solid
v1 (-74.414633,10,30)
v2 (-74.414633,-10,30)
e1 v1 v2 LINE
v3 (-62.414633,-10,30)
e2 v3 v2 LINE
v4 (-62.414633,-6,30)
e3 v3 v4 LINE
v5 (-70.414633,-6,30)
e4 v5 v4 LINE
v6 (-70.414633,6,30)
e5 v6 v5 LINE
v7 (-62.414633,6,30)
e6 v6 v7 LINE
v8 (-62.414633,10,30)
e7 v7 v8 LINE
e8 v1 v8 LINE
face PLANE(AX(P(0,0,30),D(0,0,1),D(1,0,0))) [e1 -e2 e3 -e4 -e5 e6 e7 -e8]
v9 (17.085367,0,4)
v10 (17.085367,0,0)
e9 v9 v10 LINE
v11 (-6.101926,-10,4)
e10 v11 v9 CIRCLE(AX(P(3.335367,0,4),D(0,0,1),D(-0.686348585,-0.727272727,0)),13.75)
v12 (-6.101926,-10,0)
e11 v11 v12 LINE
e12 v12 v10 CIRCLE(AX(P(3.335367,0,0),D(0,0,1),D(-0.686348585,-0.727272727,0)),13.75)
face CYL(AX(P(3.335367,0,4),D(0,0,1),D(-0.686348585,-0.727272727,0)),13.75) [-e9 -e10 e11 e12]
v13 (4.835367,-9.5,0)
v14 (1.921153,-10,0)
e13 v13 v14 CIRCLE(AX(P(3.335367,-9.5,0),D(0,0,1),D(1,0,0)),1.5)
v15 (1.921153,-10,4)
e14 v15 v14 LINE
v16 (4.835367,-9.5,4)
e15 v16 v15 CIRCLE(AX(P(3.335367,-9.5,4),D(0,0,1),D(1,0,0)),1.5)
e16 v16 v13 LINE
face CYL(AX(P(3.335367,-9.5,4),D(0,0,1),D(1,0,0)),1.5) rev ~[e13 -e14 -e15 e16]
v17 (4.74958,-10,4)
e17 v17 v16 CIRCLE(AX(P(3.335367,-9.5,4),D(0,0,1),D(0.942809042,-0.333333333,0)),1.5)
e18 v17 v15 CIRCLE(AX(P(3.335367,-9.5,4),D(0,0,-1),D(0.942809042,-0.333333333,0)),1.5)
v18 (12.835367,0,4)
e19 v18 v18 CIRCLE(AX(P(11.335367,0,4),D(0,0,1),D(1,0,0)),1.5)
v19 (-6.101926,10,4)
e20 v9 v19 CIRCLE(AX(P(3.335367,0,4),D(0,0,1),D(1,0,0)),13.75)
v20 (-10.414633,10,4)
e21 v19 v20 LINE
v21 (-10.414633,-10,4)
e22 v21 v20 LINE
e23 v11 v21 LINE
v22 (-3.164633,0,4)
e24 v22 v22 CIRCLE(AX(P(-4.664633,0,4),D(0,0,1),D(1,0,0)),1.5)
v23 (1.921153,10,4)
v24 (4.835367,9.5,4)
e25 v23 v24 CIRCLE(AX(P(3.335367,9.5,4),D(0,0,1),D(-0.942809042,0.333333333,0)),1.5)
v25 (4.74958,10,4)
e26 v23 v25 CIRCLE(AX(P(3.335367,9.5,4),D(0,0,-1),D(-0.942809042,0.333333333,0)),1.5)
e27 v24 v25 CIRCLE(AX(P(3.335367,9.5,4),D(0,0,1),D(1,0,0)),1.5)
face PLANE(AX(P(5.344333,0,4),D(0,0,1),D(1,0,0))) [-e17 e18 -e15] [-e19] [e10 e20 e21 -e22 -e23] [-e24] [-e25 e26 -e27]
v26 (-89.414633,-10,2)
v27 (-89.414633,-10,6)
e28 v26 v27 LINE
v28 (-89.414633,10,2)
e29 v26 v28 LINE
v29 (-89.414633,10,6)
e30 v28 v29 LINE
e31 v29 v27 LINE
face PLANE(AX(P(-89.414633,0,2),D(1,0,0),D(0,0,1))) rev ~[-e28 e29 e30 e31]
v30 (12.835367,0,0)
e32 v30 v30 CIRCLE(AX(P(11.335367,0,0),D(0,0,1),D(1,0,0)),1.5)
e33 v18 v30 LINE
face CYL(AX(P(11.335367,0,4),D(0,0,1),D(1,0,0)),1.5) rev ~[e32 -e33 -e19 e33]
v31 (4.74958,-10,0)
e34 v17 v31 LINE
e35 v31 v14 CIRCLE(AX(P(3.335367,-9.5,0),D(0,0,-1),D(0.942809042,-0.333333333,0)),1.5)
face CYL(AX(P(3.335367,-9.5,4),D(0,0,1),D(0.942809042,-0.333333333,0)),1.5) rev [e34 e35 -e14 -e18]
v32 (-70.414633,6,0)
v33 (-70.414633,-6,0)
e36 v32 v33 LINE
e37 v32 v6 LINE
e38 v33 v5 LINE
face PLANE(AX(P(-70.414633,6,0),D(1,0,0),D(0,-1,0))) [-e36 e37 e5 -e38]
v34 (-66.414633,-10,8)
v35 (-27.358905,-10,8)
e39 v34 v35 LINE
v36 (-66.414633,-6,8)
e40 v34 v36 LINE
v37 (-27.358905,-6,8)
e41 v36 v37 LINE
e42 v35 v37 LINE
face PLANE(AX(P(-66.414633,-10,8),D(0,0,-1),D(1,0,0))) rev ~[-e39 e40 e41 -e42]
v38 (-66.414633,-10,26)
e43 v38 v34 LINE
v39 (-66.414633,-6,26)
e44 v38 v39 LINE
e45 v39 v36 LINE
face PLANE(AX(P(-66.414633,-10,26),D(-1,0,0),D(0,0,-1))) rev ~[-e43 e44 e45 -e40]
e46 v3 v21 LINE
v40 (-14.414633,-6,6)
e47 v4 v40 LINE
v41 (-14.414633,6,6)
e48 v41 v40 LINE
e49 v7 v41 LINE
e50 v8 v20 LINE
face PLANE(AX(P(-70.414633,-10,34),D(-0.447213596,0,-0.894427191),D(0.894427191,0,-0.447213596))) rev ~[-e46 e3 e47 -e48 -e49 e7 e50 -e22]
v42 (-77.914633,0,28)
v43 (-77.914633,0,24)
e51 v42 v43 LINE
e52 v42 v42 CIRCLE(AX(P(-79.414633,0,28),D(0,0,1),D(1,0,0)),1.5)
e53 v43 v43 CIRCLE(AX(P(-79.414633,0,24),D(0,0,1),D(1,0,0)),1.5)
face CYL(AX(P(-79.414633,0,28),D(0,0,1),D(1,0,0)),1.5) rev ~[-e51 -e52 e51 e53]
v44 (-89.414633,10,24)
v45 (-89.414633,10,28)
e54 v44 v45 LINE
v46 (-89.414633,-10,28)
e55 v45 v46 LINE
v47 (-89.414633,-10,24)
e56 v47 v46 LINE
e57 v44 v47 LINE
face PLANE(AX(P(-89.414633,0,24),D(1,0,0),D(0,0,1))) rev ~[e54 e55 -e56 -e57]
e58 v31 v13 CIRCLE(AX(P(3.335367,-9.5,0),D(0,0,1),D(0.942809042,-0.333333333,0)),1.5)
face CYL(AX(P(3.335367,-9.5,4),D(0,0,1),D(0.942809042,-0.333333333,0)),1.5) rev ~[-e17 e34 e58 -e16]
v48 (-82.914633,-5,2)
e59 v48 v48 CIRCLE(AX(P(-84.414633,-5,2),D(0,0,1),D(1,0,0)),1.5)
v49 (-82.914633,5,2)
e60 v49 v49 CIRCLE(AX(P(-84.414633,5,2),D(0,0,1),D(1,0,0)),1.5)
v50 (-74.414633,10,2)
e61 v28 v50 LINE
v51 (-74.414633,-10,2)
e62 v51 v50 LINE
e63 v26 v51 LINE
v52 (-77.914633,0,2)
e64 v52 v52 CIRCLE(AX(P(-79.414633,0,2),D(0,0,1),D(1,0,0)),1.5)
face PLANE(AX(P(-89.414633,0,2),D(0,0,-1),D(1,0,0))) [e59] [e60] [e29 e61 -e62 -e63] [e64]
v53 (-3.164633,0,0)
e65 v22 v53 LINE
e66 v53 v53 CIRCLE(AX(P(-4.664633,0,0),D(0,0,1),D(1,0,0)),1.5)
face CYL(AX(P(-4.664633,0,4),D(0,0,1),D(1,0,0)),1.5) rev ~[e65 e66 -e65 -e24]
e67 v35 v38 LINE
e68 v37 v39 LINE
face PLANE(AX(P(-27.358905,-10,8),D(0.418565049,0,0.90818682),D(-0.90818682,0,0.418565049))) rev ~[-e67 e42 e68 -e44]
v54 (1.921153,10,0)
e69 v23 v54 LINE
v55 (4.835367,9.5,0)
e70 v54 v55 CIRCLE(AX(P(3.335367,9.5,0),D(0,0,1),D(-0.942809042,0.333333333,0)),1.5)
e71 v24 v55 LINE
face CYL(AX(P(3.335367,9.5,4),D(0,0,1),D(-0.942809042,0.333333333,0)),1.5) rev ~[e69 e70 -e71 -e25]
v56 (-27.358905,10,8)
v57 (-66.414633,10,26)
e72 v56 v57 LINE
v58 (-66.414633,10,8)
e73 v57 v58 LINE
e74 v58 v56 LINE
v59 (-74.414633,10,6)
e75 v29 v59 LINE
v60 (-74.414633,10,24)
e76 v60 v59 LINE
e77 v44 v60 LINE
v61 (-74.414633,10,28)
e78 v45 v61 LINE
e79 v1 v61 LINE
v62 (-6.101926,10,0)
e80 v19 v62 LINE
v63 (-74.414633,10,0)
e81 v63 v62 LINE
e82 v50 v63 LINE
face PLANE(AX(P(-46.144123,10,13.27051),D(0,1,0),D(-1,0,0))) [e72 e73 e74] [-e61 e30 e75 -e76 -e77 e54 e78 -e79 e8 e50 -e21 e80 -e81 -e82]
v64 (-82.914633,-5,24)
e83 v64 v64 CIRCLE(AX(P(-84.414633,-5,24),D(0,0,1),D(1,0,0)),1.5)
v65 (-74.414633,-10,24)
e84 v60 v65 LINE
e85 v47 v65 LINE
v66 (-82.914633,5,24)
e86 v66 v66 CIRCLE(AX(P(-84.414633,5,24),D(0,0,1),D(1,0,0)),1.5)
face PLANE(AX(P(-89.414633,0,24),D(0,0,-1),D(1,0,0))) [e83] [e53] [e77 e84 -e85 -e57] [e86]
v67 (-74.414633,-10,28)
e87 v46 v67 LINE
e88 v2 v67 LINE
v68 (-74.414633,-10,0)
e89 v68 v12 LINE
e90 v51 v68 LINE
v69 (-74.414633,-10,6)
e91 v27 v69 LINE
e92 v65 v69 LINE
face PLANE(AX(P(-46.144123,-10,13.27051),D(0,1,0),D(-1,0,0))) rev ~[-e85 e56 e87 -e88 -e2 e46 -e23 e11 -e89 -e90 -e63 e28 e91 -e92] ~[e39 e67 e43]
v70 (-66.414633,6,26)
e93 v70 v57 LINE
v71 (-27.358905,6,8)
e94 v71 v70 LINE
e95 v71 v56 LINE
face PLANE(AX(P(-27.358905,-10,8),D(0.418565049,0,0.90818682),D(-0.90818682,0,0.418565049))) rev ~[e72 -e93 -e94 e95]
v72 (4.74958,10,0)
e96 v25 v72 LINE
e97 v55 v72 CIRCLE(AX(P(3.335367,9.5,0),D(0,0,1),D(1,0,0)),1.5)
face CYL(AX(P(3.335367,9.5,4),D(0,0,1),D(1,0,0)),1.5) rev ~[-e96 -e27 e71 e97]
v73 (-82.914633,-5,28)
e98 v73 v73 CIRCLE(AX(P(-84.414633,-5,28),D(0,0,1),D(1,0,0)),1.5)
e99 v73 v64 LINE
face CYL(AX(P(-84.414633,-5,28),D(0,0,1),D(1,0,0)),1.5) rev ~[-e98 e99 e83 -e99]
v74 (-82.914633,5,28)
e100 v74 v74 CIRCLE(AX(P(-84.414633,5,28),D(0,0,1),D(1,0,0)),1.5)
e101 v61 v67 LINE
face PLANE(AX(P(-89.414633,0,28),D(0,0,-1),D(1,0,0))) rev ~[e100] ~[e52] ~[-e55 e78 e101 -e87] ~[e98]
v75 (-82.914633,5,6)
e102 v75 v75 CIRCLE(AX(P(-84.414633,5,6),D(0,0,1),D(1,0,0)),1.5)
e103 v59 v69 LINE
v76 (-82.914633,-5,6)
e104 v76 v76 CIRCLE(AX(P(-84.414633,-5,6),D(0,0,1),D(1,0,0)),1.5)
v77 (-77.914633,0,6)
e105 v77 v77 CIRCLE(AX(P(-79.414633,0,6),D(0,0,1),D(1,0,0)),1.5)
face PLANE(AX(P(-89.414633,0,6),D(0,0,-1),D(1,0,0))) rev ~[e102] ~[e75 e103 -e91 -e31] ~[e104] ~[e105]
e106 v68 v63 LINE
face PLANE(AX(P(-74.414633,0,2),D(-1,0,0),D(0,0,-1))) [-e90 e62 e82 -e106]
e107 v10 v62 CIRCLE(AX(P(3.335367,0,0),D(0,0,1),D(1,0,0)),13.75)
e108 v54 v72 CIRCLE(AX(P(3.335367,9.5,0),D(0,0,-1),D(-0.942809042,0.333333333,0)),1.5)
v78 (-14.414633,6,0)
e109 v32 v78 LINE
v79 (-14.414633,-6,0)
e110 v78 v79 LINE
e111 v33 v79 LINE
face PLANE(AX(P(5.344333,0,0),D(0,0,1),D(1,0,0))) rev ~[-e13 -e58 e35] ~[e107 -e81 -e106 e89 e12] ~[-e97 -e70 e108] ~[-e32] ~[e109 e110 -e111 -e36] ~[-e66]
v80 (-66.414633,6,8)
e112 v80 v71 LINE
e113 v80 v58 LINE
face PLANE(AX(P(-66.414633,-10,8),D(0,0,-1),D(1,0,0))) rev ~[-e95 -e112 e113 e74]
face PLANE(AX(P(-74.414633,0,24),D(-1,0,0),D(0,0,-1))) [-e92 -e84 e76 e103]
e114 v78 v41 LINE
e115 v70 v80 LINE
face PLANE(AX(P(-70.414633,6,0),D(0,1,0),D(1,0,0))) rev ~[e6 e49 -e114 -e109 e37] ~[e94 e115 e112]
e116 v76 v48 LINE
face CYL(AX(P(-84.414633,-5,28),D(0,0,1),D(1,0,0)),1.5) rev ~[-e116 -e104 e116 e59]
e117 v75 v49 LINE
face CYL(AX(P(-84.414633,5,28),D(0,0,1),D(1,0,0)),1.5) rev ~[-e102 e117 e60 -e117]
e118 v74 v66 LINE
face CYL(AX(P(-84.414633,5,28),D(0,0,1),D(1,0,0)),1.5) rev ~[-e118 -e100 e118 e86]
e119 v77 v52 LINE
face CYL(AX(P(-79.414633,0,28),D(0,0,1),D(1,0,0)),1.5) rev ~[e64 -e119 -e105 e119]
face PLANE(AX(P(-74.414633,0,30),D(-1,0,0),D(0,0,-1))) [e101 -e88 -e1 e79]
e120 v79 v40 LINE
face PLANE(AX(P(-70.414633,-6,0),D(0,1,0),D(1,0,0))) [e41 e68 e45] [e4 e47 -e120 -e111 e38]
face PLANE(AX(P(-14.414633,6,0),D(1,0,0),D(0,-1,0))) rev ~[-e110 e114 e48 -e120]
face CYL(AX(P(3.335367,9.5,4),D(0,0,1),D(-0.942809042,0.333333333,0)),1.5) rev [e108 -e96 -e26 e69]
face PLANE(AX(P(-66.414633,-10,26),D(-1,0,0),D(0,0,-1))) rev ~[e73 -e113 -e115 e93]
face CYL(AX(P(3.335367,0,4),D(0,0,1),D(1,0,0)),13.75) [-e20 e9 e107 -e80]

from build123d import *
from build123d import SkipClean  # not in build123d's __all__

# Parameters (mm, degrees)
F0_W        = 15
F0_H        = 4
F1_DEPTH    = 10
F2_T4_DEPTH = 20
F3_R        = 1.5
F4_DEPTH    = 4
F5_DEPTH    = 4
F7_DEPTH    = 20
F8_W        = 56
F8_H        = 12
F9_DEPTH    = 30
F10_R       = 1.5
F11_DEPTH   = 26


# Not quite as in the source:
# - a fillet or chamfer that OpenCascade refuses, or shapes differently, is made with other operations: its cross-section is extruded or revolved along the edge and cut away or added


with BuildPart() as f1:
    # F0 (on Front) → F1 (new body, symmetric)
    with BuildSketch(Plane.XZ):
        Polygon((-74.4146332145, 2), (-74.4146332145, 0), (5.5853667855, 0), (5.5853667855, 4), (-70.4146332145, 4), (-70.4146332145, 30), (-74.4146332145, 30), (-74.4146332145, 28), (-74.4146332145, 24), (-74.4146332145, 6), align=None)
        with Locations((-81.9146332145, 26)):
            Rectangle(F0_W, F0_H)
        with Locations((-81.9146332145, 4)):
            Rectangle(F0_W, F0_H)
    extrude(amount=F1_DEPTH, both=True)

    # F2: chamfer of 30 x 60 on 1 edges, made by hand


with BuildPart() as f2_tool2:
    # F2_s3 → F2_t4 (new body)
    with BuildSketch(Plane.XZ.offset(10)):
        Polygon((-70.4146332145, 34), (-10.4146332145, 4), (-70.4146332145, 4), align=None)
    extrude(amount=-F2_T4_DEPTH)

    split(bisect_by=Plane.XY.offset(30), keep=Keep.BOTTOM)


with BuildPart() as f1_1:
    add(f1.part, clean=False)

    # F2_t1: union F2_tool2
    add(f2_tool2.part)

    # F3 (on face) → F4 (join)
    with BuildSketch(Plane.XY.offset(4)):
        with BuildLine():
            ThreePointArc((-6.1019262586, -10), (8.7805353157, -12.6258718383), (17.0853667855, 0))
            ThreePointArc((17.0853667855, 0), (8.7805353157, 12.6258718383), (-6.1019262586, 10))
            Line((-6.1019262586, 10), (1.9211532232, 10))
            ThreePointArc((1.9211532232, 10), (3.3353667855, 11), (4.7495803479, 10))
            Line((4.7495803479, 10), (5.5853667855, 10))
            Line((5.5853667855, 10), (5.5853667855, -10))
            Line((5.5853667855, -10), (4.7495803479, -10))
            ThreePointArc((4.7495803479, -10), (3.3353667855, -11), (1.9211532232, -10))
            Line((1.9211532232, -10), (-6.1019262586, -10))
        make_face()
        with Locations((11.3353667855, 0)):
            Circle(F3_R, mode=Mode.SUBTRACT)
    extrude(amount=-F4_DEPTH)

    # F3 (on face) → F5 (cut)
    with BuildSketch(Plane.XY.offset(4)):
        with Locations((-4.6646332145, 0)):
            Circle(F3_R)
        with BuildLine():
            ThreePointArc((4.8353667855, -9.5), (3.0817138174, -8.0216021605), (1.9211532232, -10))
            Line((1.9211532232, -10), (4.7495803479, -10))
            ThreePointArc((4.7495803479, -10), (4.813764625, -9.7536529681), (4.8353667855, -9.5))
        make_face()
        with BuildLine():
            Line((4.7495803479, 10), (1.9211532232, 10))
            ThreePointArc((1.9211532232, 10), (3.0817138174, 8.0216021605), (4.8353667855, 9.5))
            ThreePointArc((4.8353667855, 9.5), (4.813764625, 9.7536529681), (4.7495803479, 10))
        make_face()
    with SkipClean():  # cleaning this boolean's faces spoils the solid; the shape is the same uncleaned
        extrude(amount=-F5_DEPTH, mode=Mode.SUBTRACT)

    # F6 (on face) → F7 (cut)
    with BuildSketch(Plane.XZ.offset(10)):
        Polygon((-27.3589051245, 8), (-66.4146332145, 26), (-66.4146332145, 8), align=None)
    extrude(amount=-F7_DEPTH, mode=Mode.SUBTRACT)

    # F8 (on face) → F9 (cut)
    with BuildSketch(Plane(origin=(0, 0, 0), x_dir=(1, 0, 0), z_dir=(0, 0, -1))):
        with Locations((-42.4146332145, 0)):
            Rectangle(F8_W, F8_H)
    extrude(amount=-F9_DEPTH, mode=Mode.SUBTRACT)

    # F10 (on face) → F11 (cut)
    with BuildSketch(Plane.XY.offset(28)):
        with Locations((-84.4146332145, 5)):
            Circle(F10_R)
        with Locations((-84.4146332145, -5)):
            Circle(F10_R)
        with Locations((-79.4146332145, 0)):
            Circle(F10_R)
    extrude(amount=-F11_DEPTH, mode=Mode.SUBTRACT)


solid = f1_1.part
